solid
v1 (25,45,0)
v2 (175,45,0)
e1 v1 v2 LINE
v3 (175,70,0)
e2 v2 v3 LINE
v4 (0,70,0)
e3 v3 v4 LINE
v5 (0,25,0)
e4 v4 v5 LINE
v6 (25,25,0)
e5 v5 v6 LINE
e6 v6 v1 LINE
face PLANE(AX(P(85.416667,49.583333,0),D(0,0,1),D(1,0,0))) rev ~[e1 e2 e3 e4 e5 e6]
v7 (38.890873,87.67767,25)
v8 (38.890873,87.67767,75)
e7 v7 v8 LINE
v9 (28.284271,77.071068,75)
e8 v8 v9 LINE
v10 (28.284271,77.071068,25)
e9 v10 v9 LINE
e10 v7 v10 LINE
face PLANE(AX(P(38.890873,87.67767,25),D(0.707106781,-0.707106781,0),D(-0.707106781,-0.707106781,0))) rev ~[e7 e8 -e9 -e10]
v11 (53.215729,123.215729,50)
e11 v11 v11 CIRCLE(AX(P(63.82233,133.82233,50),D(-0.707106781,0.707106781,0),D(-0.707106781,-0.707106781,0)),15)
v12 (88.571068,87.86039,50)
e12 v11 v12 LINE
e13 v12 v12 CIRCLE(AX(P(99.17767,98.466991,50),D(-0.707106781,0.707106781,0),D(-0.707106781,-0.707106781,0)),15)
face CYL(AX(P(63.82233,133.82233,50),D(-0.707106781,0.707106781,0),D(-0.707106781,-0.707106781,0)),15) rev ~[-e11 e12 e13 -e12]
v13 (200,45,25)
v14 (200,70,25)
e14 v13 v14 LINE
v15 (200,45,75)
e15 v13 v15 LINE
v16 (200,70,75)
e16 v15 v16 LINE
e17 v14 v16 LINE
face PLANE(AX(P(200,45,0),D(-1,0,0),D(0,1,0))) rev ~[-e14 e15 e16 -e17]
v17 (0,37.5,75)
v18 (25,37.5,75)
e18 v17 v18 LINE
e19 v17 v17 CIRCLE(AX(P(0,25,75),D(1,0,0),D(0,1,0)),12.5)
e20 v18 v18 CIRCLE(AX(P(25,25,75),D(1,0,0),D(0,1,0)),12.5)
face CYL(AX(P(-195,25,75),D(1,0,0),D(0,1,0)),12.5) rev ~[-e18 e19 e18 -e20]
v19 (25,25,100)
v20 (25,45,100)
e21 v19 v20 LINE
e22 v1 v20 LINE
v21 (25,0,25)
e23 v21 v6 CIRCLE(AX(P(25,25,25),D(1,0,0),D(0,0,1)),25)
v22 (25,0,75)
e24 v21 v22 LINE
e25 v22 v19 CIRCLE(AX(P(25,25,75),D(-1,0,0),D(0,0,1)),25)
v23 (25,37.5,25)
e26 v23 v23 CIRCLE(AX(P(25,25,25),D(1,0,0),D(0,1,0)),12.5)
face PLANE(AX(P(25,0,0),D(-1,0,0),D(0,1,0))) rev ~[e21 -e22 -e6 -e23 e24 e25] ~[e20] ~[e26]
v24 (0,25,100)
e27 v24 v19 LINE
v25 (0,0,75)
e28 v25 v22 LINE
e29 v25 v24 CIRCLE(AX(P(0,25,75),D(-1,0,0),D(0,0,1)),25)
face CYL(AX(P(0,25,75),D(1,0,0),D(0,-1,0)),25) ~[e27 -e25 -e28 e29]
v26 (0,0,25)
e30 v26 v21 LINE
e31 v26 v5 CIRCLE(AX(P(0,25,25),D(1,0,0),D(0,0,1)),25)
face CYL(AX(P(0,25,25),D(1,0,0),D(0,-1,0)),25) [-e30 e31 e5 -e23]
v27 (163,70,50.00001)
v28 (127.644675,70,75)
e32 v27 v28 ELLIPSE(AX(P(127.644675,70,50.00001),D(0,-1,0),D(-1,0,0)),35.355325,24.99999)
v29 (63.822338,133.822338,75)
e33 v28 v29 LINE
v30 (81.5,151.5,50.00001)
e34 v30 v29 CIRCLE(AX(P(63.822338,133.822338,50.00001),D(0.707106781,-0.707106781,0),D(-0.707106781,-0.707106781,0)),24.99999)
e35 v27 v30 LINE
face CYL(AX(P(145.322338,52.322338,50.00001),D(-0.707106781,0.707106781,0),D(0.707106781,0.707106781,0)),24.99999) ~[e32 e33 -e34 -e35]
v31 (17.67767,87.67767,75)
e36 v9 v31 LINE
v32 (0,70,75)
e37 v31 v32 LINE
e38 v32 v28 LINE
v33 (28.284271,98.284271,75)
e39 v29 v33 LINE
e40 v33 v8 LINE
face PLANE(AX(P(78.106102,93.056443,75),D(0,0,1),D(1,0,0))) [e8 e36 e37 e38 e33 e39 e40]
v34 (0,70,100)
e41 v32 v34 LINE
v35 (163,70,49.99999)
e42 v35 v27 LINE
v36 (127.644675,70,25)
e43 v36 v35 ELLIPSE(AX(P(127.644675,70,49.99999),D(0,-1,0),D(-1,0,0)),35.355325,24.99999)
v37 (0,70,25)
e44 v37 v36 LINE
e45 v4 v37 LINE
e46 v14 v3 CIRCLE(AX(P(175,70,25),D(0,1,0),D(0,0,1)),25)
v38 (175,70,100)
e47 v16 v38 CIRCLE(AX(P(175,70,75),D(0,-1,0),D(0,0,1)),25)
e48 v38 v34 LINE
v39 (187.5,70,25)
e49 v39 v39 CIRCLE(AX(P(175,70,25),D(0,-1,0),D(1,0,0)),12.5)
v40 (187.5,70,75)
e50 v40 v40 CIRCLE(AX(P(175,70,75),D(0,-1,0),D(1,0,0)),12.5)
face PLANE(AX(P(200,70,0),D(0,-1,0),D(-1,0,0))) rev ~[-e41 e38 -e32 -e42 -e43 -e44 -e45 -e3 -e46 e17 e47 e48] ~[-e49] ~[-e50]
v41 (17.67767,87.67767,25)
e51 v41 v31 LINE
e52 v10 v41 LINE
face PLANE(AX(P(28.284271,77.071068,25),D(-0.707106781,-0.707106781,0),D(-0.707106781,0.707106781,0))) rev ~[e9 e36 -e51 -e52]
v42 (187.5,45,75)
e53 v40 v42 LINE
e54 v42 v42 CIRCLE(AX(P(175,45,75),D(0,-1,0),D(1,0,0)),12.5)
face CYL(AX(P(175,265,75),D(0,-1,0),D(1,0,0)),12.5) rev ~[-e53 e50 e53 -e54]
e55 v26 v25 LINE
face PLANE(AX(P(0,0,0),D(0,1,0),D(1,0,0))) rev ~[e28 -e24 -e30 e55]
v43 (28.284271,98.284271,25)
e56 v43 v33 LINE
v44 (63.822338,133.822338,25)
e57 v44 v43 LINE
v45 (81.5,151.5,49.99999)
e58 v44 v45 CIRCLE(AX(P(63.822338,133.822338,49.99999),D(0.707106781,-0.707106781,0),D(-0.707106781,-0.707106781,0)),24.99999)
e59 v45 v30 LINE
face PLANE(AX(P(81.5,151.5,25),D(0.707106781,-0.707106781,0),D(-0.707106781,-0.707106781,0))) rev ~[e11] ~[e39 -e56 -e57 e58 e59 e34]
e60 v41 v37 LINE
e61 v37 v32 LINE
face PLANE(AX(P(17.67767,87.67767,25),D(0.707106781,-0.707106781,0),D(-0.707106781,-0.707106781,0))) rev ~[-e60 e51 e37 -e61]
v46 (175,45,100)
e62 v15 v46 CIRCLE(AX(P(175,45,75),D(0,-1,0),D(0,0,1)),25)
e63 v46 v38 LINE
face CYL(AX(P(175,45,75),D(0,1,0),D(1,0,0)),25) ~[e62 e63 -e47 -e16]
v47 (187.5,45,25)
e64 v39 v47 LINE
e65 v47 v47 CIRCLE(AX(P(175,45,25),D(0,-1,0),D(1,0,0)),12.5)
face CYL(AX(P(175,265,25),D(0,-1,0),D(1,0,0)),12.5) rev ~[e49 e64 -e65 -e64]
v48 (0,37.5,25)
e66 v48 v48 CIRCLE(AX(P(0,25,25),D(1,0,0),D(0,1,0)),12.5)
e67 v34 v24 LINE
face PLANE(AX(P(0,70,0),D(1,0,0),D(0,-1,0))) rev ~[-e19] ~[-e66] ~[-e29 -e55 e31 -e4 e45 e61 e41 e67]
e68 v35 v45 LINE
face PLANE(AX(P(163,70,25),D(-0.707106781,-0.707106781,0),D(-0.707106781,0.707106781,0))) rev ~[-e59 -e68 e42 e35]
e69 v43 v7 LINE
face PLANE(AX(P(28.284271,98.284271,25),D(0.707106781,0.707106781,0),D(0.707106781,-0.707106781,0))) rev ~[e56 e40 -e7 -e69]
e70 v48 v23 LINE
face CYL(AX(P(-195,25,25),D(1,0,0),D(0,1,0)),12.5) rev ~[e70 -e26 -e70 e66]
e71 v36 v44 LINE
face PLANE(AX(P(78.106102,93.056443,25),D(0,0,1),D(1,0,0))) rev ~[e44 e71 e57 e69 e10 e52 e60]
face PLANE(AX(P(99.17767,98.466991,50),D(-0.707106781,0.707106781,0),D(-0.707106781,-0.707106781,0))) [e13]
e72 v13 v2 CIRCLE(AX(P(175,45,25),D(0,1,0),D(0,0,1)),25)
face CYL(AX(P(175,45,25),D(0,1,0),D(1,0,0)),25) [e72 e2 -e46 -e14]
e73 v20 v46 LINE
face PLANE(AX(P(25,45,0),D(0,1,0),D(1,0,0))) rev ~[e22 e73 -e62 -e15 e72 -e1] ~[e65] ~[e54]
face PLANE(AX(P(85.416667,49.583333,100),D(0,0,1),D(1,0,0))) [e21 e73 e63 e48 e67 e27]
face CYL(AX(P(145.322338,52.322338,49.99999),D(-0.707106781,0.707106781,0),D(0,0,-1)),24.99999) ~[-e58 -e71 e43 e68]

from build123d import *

# Parameters (mm, degrees)
F1_DEPTH  = 100
F2_R      = 25
F3_START  = 25
F3_DEPTH  = 50
F4_R      = 24.99999
F6_D      = 25
F6_DEPTH  = 195
F6_TIP    = 7.5107577378
F8_D      = 25
F8_DEPTH  = 195
F8_TIP    = 7.5107577378
F9_R      = 15
F10_DEPTH = 50


# Not quite as in the source:
# - a fillet or chamfer is up to 0.001 mm smaller than in the source, because OpenCascade refuses the exact size


with BuildPart() as f1:
    # F0 (on Top) → F1 (new body)
    with BuildSketch(Plane.XY):
        Polygon((0, 70), (0, 0), (25, 0), (25, 45), (200, 45), (200, 70), (163, 70), align=None)
    extrude(amount=F1_DEPTH)

    # F2
    f2_edges = [f1.edges().sort_by_distance(p)[0] for p in [
        (200, 57.5, 100),
        (200, 57.5, 0),
        (12.5, 0, 100),
        (12.5, 0, 0),
    ]]
    fillet(f2_edges, radius=F2_R)

    # F0 (on Top) → F3 (join)
    with BuildSketch(Plane.XY.offset(F3_START)):
        Polygon((17.6776695297, 87.6776695297), (0, 70), (163, 70), (81.5, 151.5), (28.2842712475, 98.2842712475), (38.8908729653, 87.6776695297), (28.2842712475, 77.0710678119), align=None)
    extrude(amount=F3_DEPTH)

    # F4 (radius 25 in the source; OpenCascade refuses exactly that, so slightly less here)
    f4_edges = [f1.edges().sort_by_distance(p)[0] for p in [
        (122.25, 110.75, 75),
        (122.25, 110.75, 25),
    ]]
    fillet(f4_edges, radius=F4_R)

    # F6
    with Locations(Plane(origin=(0, 70, 0), x_dir=(-1, 0, 0), z_dir=(0, 1, 0))):
        with Locations((-175, 25), (-175, 75)):
            Hole(F6_D / 2, depth=F6_DEPTH)
            with Locations((0, 0, -(F6_DEPTH + F6_TIP / 2))):  # 118° drill point
                Cone(0, F6_D / 2, F6_TIP, mode=Mode.SUBTRACT)

    # F8
    with Locations(Plane(origin=(0, 0, 0), x_dir=(0, -1, 0), z_dir=(-1, 0, 0))):
        with Locations((-25, 25), (-25, 75)):
            Hole(F8_D / 2, depth=F8_DEPTH)
            with Locations((0, 0, -(F8_DEPTH + F8_TIP / 2))):  # 118° drill point
                Cone(0, F8_D / 2, F8_TIP, mode=Mode.SUBTRACT)

    # F9 (on face) → F10 (cut)
    with BuildSketch(Plane(origin=(-35, 35, 0), x_dir=(-0.7071067812, -0.7071067812, 0), z_dir=(-0.7071067812, 0.7071067812, 0))):
        with Locations((-139.7558800165, 50)):
            Circle(F9_R)
    extrude(amount=-F10_DEPTH, mode=Mode.SUBTRACT)


solid = f1.part
